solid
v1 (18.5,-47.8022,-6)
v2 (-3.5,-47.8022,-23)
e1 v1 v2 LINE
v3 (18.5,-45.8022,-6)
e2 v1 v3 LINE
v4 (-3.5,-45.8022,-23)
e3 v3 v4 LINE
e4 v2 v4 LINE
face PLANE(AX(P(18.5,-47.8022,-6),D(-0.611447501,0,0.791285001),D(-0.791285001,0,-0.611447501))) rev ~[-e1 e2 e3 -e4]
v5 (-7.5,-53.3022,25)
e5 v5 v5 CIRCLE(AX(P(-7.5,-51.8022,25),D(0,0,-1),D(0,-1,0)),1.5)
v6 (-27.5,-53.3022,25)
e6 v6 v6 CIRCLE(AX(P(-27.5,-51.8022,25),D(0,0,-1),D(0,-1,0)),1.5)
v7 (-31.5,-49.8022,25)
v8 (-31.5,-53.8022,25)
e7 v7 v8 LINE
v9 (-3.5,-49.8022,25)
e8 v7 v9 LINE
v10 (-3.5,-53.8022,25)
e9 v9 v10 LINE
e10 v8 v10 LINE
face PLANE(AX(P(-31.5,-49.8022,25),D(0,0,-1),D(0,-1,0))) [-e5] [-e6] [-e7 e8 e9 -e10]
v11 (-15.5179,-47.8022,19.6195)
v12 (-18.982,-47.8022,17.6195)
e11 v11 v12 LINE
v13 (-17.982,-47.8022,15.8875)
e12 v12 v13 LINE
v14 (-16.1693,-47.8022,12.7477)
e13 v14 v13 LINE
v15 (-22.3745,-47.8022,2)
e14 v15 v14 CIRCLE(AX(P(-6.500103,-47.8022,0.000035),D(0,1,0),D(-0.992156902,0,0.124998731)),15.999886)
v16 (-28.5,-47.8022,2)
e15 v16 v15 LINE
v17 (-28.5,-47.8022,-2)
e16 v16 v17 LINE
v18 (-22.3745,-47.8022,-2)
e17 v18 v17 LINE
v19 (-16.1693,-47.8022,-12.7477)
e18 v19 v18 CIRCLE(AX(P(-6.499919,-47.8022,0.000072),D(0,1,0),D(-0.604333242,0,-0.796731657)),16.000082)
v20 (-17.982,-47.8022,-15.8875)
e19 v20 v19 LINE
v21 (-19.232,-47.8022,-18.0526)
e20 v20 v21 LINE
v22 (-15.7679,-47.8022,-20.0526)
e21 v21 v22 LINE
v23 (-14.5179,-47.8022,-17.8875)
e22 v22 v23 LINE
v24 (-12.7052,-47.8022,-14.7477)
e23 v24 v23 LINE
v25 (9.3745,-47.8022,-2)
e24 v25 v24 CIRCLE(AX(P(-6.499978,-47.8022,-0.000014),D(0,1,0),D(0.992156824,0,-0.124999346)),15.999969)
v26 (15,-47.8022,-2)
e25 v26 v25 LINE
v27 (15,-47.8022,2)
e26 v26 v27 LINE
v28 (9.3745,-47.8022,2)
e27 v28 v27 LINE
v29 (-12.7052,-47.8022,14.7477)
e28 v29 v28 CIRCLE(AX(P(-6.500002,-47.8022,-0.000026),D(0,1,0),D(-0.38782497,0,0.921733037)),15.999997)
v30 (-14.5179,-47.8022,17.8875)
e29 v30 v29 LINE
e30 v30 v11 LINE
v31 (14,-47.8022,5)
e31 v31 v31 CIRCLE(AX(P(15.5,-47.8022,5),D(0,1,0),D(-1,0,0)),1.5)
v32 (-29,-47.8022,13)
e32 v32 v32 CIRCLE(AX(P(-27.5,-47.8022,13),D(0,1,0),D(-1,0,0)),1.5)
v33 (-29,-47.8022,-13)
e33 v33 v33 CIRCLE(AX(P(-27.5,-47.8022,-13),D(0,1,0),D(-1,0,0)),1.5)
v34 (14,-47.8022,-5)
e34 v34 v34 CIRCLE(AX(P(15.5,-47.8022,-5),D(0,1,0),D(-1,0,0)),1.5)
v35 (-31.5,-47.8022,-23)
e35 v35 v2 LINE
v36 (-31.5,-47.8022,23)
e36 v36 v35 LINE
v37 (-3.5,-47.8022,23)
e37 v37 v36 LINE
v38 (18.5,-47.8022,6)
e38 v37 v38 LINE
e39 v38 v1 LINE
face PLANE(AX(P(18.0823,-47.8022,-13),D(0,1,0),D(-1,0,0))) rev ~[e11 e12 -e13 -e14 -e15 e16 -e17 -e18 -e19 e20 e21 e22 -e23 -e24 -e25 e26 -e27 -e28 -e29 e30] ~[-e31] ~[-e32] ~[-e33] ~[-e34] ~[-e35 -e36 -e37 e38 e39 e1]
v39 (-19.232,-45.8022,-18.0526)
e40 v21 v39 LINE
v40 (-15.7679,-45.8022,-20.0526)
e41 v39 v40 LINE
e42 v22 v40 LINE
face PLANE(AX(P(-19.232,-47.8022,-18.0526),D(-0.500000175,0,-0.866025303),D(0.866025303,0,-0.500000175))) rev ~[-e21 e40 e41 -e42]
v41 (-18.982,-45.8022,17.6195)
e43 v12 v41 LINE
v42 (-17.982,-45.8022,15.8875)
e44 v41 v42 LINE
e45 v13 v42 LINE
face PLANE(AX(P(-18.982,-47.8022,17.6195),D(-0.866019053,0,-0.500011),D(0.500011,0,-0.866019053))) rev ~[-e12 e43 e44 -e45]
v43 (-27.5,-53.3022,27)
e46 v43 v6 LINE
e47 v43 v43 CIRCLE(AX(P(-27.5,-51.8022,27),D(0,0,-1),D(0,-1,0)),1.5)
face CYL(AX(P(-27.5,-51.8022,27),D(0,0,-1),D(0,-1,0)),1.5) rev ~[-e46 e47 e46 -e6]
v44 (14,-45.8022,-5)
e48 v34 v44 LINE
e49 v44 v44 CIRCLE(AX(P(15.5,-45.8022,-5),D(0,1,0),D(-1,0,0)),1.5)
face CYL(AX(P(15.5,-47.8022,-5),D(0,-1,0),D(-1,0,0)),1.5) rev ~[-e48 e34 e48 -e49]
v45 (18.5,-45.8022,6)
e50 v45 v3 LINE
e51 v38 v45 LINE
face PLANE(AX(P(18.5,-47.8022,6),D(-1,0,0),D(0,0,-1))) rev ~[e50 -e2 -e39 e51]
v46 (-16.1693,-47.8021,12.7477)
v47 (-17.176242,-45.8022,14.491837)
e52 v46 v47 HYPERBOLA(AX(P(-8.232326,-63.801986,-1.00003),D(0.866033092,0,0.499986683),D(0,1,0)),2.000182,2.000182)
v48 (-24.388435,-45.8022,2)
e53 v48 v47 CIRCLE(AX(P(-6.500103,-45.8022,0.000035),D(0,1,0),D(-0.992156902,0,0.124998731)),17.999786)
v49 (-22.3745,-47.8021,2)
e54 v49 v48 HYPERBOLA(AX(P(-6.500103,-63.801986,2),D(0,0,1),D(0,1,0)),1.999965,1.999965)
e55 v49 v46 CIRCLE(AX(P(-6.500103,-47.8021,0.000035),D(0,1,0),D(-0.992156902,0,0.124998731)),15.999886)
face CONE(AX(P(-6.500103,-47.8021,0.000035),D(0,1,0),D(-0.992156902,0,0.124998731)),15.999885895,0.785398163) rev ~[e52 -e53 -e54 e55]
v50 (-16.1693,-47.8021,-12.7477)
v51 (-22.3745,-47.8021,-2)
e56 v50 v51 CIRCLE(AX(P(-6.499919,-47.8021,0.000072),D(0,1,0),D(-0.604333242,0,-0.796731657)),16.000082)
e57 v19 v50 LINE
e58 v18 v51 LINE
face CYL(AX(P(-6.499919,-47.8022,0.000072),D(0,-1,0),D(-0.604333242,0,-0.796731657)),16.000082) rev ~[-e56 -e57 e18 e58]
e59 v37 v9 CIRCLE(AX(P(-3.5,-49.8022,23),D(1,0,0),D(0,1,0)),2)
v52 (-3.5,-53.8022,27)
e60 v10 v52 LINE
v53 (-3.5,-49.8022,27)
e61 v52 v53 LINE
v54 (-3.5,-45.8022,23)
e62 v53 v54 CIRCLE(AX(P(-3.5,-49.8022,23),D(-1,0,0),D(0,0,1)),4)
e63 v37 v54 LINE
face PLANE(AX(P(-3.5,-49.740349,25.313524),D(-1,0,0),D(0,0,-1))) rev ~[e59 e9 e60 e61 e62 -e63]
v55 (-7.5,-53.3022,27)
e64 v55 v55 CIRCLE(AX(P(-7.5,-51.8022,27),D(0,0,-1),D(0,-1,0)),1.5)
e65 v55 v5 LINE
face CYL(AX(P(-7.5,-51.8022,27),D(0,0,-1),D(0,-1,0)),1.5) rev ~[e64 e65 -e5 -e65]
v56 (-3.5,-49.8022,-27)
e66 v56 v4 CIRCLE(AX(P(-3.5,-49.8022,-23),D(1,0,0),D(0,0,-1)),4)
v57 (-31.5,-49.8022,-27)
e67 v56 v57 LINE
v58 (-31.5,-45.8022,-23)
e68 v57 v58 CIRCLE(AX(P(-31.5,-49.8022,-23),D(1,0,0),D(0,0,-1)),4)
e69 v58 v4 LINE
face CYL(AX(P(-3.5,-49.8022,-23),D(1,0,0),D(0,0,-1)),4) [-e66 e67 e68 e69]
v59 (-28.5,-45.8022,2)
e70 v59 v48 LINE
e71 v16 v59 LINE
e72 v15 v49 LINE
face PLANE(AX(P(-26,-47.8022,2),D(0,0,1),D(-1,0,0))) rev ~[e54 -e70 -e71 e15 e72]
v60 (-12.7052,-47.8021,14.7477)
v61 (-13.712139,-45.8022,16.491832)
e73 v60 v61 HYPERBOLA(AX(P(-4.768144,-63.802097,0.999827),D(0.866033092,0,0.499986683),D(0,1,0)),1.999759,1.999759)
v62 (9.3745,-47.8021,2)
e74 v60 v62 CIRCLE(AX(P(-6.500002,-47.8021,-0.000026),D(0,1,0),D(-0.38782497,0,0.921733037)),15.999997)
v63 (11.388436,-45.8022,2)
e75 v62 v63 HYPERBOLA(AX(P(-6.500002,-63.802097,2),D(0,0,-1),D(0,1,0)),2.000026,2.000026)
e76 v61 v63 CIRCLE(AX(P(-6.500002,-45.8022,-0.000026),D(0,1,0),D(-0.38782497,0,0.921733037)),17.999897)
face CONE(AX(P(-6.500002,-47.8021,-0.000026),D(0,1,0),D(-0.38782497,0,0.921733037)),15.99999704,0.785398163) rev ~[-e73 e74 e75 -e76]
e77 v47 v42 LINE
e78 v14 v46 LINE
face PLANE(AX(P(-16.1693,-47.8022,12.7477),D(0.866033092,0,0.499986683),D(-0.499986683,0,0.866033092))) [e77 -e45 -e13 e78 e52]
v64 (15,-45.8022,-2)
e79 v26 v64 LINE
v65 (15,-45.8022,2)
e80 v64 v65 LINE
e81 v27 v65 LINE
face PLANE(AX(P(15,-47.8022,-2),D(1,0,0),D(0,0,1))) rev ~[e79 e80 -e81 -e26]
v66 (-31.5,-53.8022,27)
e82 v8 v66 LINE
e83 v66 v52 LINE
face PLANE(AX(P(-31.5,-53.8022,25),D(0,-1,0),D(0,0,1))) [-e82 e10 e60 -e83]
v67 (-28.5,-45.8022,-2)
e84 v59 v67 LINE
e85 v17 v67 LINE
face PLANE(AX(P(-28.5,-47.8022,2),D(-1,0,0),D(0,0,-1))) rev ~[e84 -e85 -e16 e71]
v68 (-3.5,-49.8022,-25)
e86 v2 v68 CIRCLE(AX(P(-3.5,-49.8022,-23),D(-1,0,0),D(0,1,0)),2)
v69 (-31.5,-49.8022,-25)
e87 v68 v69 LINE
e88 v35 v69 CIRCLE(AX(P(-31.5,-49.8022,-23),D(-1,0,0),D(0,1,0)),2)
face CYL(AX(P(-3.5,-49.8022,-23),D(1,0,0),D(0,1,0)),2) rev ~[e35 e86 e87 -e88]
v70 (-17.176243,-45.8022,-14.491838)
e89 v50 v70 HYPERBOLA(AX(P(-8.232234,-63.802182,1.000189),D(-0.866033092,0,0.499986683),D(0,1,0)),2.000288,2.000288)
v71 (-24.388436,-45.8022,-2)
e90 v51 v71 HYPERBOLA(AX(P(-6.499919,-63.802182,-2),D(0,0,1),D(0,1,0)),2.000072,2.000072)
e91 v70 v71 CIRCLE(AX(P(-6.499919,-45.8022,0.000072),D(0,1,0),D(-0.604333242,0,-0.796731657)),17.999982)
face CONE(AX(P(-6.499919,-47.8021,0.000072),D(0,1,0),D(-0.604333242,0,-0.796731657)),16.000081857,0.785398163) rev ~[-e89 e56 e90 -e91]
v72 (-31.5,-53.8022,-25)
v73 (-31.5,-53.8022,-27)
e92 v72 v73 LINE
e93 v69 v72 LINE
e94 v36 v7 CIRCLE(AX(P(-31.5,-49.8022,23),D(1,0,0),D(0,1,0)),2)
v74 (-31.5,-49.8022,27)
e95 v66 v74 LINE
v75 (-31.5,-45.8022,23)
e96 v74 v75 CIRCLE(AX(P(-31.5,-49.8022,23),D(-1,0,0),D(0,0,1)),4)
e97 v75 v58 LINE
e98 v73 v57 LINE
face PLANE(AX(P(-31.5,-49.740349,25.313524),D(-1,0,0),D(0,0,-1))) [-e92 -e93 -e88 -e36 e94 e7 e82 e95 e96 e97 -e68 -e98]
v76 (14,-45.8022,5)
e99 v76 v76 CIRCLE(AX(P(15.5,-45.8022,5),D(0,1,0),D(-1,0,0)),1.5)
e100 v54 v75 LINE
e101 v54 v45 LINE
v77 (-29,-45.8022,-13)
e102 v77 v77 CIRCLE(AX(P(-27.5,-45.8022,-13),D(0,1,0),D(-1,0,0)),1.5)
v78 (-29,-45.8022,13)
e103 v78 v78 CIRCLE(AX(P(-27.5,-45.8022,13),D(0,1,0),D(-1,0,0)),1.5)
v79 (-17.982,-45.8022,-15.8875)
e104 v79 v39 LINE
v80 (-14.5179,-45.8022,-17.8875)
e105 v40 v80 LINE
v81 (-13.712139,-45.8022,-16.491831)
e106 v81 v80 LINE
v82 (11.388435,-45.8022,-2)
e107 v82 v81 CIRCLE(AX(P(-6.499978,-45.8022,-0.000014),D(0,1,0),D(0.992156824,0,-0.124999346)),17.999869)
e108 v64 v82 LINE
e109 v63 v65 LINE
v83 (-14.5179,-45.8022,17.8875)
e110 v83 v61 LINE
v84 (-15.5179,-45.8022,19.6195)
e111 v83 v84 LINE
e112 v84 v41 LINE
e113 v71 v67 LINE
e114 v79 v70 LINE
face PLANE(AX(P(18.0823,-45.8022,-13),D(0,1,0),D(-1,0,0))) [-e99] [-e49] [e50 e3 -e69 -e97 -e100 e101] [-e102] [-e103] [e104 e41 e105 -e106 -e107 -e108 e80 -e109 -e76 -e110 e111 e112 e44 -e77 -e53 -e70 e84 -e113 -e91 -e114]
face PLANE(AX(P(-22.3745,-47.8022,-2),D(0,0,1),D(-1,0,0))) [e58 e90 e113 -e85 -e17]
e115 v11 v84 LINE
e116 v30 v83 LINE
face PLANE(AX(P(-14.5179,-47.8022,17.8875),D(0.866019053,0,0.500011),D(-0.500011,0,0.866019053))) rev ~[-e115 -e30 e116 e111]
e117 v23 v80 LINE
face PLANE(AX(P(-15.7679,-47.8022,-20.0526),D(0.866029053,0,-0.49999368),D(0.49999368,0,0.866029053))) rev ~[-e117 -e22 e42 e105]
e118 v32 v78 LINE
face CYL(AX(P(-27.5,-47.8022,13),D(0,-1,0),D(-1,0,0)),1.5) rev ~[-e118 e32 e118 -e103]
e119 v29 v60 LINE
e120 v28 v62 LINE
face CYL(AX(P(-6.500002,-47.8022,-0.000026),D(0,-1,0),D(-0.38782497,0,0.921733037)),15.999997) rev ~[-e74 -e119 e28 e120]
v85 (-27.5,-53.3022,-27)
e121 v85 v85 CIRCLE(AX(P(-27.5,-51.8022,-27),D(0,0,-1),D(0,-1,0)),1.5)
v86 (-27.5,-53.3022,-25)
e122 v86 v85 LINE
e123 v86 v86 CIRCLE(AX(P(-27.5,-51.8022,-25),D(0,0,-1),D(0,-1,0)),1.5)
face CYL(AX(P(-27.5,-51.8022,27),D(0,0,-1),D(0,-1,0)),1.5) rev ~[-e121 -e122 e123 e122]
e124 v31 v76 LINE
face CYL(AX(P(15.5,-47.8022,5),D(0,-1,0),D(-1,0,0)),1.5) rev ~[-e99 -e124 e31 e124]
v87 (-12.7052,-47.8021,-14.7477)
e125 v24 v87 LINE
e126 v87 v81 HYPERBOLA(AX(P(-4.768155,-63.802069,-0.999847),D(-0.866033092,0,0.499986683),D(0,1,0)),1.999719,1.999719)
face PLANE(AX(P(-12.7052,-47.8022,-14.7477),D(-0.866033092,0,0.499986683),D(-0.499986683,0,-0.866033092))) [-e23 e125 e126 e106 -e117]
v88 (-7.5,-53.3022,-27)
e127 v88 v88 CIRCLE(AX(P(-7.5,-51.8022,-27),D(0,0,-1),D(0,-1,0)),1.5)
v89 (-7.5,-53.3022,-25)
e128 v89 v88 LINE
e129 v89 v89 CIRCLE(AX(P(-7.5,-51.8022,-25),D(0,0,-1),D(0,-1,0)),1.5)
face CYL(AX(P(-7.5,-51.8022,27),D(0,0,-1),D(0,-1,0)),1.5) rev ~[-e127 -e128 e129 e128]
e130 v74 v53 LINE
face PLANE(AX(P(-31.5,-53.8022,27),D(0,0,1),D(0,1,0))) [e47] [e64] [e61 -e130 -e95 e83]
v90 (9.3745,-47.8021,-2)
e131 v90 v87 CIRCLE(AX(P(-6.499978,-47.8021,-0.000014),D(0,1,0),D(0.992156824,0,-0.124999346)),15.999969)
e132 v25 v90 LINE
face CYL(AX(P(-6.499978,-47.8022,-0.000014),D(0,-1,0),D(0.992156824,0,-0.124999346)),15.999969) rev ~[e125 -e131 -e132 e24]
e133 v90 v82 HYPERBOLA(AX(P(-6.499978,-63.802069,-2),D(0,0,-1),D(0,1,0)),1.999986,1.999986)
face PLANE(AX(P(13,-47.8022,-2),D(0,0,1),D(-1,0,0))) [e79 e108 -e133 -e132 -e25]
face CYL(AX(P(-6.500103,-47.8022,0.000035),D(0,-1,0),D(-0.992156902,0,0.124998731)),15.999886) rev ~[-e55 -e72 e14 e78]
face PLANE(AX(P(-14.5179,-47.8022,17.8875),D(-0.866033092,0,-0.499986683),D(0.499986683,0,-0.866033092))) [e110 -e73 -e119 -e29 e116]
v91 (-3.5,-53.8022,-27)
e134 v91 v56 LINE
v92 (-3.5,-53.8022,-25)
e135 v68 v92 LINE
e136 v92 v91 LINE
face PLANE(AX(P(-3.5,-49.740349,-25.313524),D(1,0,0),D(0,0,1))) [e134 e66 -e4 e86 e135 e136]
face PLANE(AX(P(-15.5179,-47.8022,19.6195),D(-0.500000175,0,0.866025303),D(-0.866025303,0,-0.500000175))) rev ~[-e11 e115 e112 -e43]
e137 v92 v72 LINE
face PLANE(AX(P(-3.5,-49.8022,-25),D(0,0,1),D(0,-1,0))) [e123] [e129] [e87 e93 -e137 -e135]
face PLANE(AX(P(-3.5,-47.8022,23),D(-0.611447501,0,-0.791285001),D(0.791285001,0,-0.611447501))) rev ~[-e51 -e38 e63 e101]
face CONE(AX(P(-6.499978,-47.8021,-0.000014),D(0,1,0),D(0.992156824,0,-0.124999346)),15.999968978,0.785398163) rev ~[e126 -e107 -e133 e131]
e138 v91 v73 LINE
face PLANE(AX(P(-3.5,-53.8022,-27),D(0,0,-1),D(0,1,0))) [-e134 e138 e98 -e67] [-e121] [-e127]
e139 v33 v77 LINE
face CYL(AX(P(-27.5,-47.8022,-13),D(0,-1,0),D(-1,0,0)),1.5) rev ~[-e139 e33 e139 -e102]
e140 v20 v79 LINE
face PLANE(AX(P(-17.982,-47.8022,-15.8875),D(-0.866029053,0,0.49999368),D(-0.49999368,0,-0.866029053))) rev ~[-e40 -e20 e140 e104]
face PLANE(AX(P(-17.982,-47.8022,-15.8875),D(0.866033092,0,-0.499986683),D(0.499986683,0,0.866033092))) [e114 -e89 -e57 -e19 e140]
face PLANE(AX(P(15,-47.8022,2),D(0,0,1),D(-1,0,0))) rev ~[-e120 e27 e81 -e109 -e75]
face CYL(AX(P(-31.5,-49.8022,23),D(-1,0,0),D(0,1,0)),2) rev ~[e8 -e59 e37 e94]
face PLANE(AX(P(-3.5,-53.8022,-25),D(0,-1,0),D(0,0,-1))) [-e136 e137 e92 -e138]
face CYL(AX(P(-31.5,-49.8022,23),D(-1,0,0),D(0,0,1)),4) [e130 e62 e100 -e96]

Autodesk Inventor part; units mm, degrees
ref_plane "YZ Plane" through (0, 0, 0) normal (1, 0, 0) x (0, 1, 0)
ref_plane "XZ Plane" through (0, 0, 0) normal (0, 1, 0) x (-1, 0, 0)
ref_plane "XY Plane" through (0, 0, 0) normal (0, 0, 1) x (1, 0, 0)
ref_plane "作業平面1" through (-13.0598, -47.8022, -11.0593) normal (0, 1, 0) x (-1, 0, 0)
ref_plane "作業平面2" through (18.0823, -47.8022, -13) normal (0, 1, 0) x (-1, 0, 0)
sketch "スケッチ15" plane through (18.0823, -47.8022, -13) normal (0, 1, 0) x (-1, 0, 0)
  arc A0 (34.2516, 0.2523) -> (40.4568, 11) centre (24.5823, 13) ccw
  arc A1 (8.7078, 11) -> (30.7875, -1.7477) centre (24.5823, 13) ccw
  arc A2 (30.7875, 27.7477) -> (8.7078, 15) centre (24.5823, 13) ccw
  arc A3 (40.4568, 15) -> (34.2516, 25.7477) centre (24.5823, 13) ccw
  line L0 (46.5823, 11) -> (44.0823, 11)
  line L1 (44.0823, 15) -> (46.5823, 15)
  line L2 (37.0643, 30.6195) -> (36.0643, 28.8875)
  line L3 (32.6002, 30.8875) -> (33.6002, 32.6195)
  line L4 (3.0823, 15) -> (5.0823, 15)
  line L5 (5.0823, 11) -> (3.0823, 11)
  line L6 (3.0823, 11) -> (3.0823, 15)
  line L7 (46.5823, 15) -> (46.5823, 11)
  line L8 (33.6002, 32.6195) -> (37.0643, 30.6195)
  line L9 (37.3143, -5.0526) -> (33.8502, -7.0526)
  line L10 (33.8502, -7.0526) -> (32.6002, -4.8875)
  line L11 (36.0643, -2.8875) -> (37.3143, -5.0526)
  circle A4 centre (45.5823, 26) radius 1.5
  circle A5 centre (45.5823, 0) radius 1.5
  line L12 (21.5823, 36) -> (-0.4177, 19)
  line L13 (-0.4177, 19) -> (-0.4177, 7)
  line L14 (-0.4177, 7) -> (21.5823, -10)
  line L15 (49.5823, -4) -> (49.5823, 30)
  circle A6 centre (2.5823, 18) radius 1.5
  circle A7 centre (2.5823, 8) radius 1.5
  line L16 (5.0823, 11) -> (8.7078, 11)
  line L17 (5.0823, 15) -> (8.7078, 15)
  line L18 (36.0643, -2.8875) -> (34.2516, 0.2523)
  line L19 (30.7875, -1.7477) -> (32.6002, -4.8875)
  line L20 (40.4568, 11) -> (44.0823, 11)
  line L21 (44.0823, 15) -> (40.4568, 15)
  line L22 (34.2516, 25.7477) -> (36.0643, 28.8875)
  line L23 (32.6002, 30.8875) -> (30.7875, 27.7477)
  line L24 (49.5823, -4) -> (49.5823, -14)
  line L25 (49.5823, -14) -> (21.5823, -14)
  line L26 (21.5823, -14) -> (21.5823, -10)
  line L27 (21.5823, 36) -> (21.5823, 40)
  line L28 (21.5823, 40) -> (49.5823, 40)
  line L29 (49.5823, 40) -> (49.5823, 30)
  point P0 (18.0823, 13)
  dimension "d79" = 10
  dimension "d80" = 10
extrude "プレート6" add sketch "スケッチ15" along normal blind 2
chamfer "面取り4" distance 2 angle 45 4 edges at (-20.3564, -45.8022, -8) (-20.3564, -45.8022, 8) (1.5, -45.8022, 13.8564) (1.5, -45.8022, -13.8564)
sketch "スケッチ16" plane through (-31.5, -47.8022, 27) normal (0, 0, 1) x (1, 0, 0)
  point P0 (31.5, 47.8022)
sketch "スケッチ17" plane through (-31.5, -45.8022, 25) normal (0, 0, 1) x (1, 0, 0)
  line L0 (28, 0) -> (0, 0)
  line L1 (0, 0) -> (0, -8)
  line L2 (0, -8) -> (28, -8)
  line L3 (28, -8) -> (28, 0)
edge flange "フランジ2" height 8 angle 90 thickness 2 bend radius 2 thickness toward (0, 0, 1) relief straight relief width 2 relief depth 1 corner gap 2 corner form 0 edges at (-17.5, -47.8022, 27) (-17.5, -47.8022, -27) wall of the first edge with corners at (-3.5, -45.8022, 25) (-31.5, -45.8022, 25) (-31.5, -53.8022, 25) (-3.5, -53.8022, 25)
bend "曲げ2"
corner "コーナー2"
sketch "スケッチ18" plane through (-31.5, -53.8022, 27) normal (0, 0, 1) x (1, 0, 0)
  line L0 (28, 4) -> (28, 0) projected
  line L1 (0, 0) -> (0, 4) projected
  point P0 (31.5, 53.8022)
  point P1 (24, 2)
  point P2 (4, 2)
  point P3 (28, 2)
  point P4 (0, 2)
  dimension "d95" = 4
  dimension "d96" = 4
hole "穴4" at (-27.5, -51.8022, 27) at (-7.5, -51.8022, 27) direction (0, 0, -1) diameter 3 end through all
equation "\"d102\" = Thickness"
equation "\"d81\" = Thickness"
equation "\"d85\" = BendReliefWidth"
equation "\"d86\" = BendReliefDepth"
equation "\"d87\" = MinimumRemnant"
equation "\"d88\" = TransitionRadius"
equation "\"d91\" = BendRadius"
equation "\"d92\" = CornerReliefSize"
equation "\"d93\" = GapSize"
equation "\"d94\" = JacobiRadiusSize"
equation "\"BendRadius\" = Thickness"
equation "\"BendReliefWidth\" = Thickness"
equation "\"BendReliefDepth\" = 0.5 * Thickness"
equation "\"CornerReliefSize\" = 4 * Thickness"
equation "\"MinimumRemnant\" = 2 * Thickness"
equation "\"TransitionRadius\" = BendRadius"
equation "\"JacobiRadiusSize\" = Thickness"
equation "\"GapSize\" = Thickness"
equation "\"Thickness\" = 2"
properties part number "bearingcover" material "アルミニウム 6061"
